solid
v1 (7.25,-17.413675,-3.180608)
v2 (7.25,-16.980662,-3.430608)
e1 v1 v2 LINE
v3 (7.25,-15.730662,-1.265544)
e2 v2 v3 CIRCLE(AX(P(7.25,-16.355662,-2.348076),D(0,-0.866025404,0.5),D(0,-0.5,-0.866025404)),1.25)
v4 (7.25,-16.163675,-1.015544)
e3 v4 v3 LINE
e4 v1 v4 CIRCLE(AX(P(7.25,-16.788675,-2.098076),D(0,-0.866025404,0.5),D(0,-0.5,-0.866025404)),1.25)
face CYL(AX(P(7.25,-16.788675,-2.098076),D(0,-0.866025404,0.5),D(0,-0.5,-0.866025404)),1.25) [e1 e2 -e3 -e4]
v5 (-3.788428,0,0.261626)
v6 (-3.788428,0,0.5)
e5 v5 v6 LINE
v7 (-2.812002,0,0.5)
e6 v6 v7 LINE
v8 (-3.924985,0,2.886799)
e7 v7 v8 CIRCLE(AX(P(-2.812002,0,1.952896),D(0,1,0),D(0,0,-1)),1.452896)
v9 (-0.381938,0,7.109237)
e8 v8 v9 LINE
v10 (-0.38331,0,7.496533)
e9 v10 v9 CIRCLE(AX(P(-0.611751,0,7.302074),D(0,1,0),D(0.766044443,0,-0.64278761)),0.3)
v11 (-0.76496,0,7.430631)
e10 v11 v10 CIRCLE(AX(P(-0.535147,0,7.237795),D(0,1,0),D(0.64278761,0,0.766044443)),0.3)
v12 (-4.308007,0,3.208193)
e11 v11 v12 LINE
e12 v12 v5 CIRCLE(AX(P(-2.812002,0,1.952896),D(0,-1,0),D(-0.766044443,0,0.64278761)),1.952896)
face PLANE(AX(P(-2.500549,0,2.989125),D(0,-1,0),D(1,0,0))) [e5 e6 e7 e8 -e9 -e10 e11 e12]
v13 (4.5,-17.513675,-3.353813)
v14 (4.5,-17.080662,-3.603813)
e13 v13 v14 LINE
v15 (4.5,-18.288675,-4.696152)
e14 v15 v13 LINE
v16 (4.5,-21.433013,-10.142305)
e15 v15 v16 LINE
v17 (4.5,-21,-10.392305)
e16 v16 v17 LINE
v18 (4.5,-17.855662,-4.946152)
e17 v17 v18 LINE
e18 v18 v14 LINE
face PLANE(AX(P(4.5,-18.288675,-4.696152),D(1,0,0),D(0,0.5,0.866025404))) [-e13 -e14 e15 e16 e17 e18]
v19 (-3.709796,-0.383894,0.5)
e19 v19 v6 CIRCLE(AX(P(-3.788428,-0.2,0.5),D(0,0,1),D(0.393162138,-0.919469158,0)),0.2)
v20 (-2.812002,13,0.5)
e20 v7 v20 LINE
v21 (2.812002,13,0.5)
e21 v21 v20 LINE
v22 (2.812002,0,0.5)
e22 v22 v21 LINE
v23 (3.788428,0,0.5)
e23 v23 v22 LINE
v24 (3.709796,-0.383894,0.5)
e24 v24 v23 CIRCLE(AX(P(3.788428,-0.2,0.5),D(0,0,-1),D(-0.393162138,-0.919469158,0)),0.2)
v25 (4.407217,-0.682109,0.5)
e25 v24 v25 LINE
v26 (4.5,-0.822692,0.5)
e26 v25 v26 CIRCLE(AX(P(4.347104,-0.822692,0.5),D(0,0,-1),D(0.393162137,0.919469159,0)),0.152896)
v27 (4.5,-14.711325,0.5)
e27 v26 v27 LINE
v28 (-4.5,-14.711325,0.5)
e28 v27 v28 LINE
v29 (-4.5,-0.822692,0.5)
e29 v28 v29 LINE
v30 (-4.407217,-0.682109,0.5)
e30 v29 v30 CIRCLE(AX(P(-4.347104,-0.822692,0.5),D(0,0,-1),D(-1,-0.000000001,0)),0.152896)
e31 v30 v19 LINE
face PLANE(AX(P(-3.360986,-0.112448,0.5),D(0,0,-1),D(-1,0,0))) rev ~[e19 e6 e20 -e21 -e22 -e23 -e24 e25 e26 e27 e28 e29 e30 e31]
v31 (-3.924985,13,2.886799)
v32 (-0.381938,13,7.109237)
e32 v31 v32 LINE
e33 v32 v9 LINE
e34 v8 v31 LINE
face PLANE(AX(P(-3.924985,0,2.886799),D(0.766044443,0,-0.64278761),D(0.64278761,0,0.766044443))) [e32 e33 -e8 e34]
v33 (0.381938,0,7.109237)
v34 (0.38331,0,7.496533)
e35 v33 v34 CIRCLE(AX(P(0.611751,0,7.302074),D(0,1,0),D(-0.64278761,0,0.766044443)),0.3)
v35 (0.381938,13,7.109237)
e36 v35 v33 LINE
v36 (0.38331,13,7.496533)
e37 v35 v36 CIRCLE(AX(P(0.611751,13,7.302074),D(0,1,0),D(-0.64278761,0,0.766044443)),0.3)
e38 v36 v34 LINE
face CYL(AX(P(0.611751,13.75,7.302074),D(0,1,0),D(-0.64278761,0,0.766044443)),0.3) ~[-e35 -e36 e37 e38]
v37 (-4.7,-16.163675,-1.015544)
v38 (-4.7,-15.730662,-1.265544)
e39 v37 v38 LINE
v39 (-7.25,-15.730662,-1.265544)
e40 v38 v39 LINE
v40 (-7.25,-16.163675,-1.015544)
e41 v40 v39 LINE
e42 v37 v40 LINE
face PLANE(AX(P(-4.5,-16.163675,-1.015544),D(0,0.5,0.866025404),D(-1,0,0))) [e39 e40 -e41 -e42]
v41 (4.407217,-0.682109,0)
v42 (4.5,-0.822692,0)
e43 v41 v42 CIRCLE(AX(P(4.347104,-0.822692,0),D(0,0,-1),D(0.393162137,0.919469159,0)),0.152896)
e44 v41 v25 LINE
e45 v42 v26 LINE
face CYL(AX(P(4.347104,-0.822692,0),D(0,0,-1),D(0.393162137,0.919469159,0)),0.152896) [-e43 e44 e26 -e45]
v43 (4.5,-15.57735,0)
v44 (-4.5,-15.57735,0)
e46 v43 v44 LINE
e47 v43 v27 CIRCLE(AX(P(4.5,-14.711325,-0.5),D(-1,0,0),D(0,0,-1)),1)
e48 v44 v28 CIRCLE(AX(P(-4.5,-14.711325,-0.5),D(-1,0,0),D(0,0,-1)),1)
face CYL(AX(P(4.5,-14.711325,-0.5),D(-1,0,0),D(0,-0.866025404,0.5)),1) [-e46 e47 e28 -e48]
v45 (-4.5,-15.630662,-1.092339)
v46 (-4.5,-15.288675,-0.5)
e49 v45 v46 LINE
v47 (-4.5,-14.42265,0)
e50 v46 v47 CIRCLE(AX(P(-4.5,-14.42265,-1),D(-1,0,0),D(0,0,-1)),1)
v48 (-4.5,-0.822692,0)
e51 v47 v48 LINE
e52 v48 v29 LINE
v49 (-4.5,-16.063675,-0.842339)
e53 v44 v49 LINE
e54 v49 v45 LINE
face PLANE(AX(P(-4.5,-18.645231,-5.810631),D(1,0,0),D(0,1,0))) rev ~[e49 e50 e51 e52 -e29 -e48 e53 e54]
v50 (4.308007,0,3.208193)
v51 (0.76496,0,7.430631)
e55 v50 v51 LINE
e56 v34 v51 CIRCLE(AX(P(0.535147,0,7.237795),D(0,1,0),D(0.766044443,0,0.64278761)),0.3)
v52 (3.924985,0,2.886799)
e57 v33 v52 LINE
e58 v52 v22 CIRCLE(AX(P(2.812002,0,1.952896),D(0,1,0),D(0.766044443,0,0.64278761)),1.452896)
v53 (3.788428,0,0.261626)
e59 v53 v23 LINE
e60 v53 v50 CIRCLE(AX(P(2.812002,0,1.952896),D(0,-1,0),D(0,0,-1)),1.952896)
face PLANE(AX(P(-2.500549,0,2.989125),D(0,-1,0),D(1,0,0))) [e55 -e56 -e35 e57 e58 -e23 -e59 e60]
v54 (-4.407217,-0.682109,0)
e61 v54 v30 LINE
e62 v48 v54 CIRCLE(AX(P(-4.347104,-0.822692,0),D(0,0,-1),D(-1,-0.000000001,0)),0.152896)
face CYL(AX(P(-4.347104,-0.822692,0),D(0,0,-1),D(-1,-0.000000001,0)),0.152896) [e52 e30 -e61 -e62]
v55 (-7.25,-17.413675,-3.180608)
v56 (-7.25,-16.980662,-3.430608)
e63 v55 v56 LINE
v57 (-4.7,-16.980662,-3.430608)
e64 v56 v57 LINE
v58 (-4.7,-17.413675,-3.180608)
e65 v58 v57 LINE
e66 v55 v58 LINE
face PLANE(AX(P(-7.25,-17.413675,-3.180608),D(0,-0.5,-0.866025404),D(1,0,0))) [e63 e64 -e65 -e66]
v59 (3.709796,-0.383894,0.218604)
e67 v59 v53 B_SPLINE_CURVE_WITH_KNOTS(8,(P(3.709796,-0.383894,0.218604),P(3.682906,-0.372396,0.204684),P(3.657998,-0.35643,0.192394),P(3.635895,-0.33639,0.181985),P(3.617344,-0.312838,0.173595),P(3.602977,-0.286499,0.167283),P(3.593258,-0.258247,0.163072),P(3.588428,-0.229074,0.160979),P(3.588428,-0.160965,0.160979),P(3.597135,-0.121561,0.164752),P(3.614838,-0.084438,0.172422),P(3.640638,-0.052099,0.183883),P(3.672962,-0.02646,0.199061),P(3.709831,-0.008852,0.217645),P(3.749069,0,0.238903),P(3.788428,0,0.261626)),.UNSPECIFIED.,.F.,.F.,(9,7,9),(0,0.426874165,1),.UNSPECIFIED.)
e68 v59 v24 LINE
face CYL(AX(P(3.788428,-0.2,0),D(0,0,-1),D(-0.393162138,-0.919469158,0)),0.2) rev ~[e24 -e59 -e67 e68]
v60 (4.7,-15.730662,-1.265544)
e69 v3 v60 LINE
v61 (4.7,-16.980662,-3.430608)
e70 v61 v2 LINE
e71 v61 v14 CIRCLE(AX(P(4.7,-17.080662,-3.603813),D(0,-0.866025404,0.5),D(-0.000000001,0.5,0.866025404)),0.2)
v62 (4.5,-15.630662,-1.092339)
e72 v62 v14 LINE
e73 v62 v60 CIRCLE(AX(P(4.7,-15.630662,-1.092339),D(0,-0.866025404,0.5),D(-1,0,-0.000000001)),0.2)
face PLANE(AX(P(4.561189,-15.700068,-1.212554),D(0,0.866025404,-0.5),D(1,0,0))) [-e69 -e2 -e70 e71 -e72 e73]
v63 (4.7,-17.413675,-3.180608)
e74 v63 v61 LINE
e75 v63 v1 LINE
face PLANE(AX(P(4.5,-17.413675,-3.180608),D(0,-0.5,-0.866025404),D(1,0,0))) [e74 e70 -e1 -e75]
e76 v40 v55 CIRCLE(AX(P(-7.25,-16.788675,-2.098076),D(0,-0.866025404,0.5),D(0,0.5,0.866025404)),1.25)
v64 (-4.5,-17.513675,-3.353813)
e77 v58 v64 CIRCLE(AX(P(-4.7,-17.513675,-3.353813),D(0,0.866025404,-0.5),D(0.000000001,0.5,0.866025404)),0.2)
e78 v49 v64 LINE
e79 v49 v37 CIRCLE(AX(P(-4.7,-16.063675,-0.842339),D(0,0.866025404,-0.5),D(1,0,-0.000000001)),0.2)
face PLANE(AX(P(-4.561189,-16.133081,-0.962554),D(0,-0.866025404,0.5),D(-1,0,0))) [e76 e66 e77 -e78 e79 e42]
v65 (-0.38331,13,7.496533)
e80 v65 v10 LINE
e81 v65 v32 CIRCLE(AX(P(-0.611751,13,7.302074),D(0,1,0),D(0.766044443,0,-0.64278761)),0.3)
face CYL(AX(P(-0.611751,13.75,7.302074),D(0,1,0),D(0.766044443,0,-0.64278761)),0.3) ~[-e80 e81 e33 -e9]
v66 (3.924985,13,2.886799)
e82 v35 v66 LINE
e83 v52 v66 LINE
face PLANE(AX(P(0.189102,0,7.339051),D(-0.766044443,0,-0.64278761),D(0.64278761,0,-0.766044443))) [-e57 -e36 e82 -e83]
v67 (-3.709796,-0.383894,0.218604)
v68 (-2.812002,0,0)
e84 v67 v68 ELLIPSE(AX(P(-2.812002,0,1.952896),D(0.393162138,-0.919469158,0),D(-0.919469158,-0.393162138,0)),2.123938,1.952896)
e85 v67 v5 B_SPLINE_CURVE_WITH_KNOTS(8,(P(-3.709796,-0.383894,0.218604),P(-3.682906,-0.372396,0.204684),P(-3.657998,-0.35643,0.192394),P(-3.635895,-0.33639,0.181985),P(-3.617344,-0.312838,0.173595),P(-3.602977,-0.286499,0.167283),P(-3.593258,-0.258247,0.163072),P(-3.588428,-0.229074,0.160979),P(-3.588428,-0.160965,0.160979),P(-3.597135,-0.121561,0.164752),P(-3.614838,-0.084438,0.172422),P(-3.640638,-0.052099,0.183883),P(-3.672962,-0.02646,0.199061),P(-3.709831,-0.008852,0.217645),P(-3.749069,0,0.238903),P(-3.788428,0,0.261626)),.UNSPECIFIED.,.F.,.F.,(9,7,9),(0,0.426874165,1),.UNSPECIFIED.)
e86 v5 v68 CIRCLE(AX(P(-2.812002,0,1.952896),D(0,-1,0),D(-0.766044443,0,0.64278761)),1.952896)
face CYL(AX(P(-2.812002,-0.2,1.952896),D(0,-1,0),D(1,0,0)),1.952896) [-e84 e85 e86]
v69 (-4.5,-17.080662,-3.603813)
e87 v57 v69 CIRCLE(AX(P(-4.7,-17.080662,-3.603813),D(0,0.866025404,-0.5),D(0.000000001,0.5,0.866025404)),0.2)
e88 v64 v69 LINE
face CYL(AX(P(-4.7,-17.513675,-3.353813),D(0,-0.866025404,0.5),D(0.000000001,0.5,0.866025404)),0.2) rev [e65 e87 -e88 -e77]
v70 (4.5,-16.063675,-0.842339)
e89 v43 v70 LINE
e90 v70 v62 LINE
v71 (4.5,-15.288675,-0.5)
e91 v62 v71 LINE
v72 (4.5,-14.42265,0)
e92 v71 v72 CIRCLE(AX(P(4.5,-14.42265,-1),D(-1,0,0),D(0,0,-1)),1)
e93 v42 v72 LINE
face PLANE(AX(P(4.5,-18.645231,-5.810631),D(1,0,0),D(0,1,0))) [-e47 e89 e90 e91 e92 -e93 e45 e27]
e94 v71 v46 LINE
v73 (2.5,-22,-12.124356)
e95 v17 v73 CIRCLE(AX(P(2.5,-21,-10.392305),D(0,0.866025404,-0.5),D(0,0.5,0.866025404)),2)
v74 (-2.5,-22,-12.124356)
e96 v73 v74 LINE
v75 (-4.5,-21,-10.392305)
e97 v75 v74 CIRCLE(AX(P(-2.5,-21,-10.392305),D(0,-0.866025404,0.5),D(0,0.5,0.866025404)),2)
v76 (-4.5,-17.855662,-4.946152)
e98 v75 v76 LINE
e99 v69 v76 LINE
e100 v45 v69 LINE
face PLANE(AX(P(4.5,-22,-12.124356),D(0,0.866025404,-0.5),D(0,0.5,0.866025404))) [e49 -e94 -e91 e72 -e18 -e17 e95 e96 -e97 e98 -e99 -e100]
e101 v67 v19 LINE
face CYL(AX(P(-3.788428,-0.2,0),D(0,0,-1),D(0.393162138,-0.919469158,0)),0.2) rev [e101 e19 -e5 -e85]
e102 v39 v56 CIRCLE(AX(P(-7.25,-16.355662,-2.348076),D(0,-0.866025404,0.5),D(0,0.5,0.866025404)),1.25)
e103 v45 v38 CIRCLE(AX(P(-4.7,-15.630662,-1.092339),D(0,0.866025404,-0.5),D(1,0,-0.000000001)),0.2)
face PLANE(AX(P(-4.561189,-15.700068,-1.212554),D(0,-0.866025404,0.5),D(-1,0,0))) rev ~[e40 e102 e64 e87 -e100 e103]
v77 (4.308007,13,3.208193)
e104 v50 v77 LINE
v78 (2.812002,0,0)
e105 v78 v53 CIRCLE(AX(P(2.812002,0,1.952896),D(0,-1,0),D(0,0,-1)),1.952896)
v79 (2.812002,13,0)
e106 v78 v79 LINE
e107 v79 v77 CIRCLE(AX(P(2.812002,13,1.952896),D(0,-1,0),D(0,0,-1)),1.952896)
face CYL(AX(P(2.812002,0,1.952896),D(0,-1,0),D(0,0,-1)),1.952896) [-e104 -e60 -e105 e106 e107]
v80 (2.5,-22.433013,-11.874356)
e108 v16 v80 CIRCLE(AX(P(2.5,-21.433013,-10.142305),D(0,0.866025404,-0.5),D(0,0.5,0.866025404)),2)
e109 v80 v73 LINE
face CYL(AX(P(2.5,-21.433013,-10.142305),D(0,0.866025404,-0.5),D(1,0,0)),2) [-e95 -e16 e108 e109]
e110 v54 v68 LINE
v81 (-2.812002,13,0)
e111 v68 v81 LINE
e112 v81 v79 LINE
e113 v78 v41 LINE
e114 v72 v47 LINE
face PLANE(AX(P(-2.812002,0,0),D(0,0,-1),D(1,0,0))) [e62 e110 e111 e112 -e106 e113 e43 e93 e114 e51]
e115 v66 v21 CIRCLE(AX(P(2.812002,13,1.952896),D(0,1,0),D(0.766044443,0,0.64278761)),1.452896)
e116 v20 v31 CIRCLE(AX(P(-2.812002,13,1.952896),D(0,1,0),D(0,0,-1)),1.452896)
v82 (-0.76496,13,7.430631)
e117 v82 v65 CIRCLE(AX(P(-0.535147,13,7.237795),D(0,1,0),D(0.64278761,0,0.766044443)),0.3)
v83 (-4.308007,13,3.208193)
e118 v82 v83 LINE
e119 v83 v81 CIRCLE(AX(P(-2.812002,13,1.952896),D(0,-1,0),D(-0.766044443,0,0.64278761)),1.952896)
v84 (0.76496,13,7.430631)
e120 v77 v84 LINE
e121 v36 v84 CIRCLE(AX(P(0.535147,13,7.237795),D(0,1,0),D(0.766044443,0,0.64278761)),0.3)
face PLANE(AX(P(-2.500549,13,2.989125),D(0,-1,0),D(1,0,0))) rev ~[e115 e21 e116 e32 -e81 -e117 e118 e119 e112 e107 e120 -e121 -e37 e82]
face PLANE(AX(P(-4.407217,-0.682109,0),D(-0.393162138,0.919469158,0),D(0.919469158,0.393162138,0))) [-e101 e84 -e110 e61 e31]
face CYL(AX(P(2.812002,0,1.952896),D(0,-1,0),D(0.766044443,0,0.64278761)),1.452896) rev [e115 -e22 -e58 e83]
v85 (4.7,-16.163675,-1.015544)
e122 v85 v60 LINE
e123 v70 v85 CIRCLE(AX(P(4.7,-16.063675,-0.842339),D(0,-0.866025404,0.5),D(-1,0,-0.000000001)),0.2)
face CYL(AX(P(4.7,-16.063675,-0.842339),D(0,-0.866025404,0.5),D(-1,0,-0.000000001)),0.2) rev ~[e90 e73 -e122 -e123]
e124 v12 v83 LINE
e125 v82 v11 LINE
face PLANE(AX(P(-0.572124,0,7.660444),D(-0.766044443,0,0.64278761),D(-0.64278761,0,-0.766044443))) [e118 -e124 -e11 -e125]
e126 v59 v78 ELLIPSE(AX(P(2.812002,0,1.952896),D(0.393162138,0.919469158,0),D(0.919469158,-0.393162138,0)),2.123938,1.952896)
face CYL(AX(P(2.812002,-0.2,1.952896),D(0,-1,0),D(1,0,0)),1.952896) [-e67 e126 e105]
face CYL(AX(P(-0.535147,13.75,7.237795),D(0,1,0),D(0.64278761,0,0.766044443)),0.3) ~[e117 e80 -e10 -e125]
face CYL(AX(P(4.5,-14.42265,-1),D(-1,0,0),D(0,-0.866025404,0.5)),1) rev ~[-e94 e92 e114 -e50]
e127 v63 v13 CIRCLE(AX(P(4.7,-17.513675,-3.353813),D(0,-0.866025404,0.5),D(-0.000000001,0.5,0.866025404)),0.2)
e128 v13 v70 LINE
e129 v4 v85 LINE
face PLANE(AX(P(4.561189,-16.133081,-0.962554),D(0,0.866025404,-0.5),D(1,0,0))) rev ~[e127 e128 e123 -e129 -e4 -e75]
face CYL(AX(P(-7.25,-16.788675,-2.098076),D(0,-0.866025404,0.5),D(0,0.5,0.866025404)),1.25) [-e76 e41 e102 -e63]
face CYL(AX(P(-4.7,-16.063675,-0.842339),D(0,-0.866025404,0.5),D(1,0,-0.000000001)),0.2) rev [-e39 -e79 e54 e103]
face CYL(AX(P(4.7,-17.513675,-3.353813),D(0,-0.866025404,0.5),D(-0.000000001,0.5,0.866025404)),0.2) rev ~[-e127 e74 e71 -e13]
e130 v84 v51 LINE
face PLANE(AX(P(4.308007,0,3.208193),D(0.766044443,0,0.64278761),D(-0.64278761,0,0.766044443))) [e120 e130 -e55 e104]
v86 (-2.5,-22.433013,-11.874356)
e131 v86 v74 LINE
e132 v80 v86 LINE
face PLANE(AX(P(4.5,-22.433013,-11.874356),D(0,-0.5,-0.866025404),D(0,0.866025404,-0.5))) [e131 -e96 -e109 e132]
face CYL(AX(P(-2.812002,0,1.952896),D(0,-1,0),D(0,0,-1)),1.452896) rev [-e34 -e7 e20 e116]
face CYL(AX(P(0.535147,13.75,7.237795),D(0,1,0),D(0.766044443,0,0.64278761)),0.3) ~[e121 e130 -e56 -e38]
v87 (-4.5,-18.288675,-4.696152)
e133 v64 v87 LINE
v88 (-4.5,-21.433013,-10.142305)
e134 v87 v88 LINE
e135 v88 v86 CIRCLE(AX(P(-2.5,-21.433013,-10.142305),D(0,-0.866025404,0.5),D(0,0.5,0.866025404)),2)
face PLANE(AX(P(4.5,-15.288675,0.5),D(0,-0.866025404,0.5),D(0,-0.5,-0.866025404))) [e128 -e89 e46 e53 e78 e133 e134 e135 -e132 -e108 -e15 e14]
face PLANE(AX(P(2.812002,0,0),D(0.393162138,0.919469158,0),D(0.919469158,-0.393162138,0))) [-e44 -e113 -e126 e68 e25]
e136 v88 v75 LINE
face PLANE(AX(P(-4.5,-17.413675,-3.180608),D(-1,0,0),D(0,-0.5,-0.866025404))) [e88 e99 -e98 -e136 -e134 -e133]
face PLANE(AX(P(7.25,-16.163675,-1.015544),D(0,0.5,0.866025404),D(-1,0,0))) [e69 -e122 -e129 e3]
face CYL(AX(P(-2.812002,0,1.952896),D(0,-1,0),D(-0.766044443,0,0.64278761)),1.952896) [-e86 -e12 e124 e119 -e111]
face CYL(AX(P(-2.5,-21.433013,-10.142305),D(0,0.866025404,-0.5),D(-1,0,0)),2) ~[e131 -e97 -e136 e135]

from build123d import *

# Parameters (mm, degrees)
F1_DEPTH      = 13
F3_W          = 5.624003956
F3_H          = 13
F4_DEPTH      = 0.5
F6_DEPTH      = 9
F8_W          = 1.375
F8_H          = 2.5
F9_DEPTH      = 0.5
F10_R         = 2
F11_R         = 1
F12_T1_DEPTH  = 14.5
F13_T1_DEPTH  = 0.5
F13_T6_DEPTH  = 0.5
F13_S7_R      = 1.95289555
F13_T8_DEPTH  = 2
F13_T12_DEPTH = 0.5
F13_S13_R     = 1.95289555
F13_T14_DEPTH = 2


# Not quite as in the source:
# - a fillet or chamfer that OpenCascade refuses, or shapes differently, is made with other operations: its cross-section is extruded or revolved along the edge and cut away or added


with BuildPart() as f1:
    # F0 (on Front) → F1 (new body)
    with BuildSketch(Plane.XZ):
        with BuildLine():
            Line((-0.1891016816, 7.3390506263), (-0.5721239031, 7.6604444312))
            Line((-0.5721239031, 7.6604444312), (-4.3080067621, 3.2081926126))
            ThreePointArc((-4.3080067621, 3.2081926126), (-4.5819264222, 1.1275662273), (-2.812001978, 0))
            Line((-2.812001978, 0), (0, 0))
            Line((0, 0), (0, 0.5))
            Line((0, 0.5), (-2.812001978, 0.5))
            ThreePointArc((-2.812001978, 0.5), (-4.1287725287, 1.3388753582), (-3.9249845405, 2.8867988077))
            Line((-3.9249845405, 2.8867988077), (-0.1891016816, 7.3390506263))
        make_face()
        with BuildLine():
            Line((0, 0.5), (0, 0))
            Line((0, 0), (2.812001978, 0))
            ThreePointArc((2.812001978, 0), (4.5819264222, 1.1275662273), (4.3080067621, 3.2081926126))
            Line((4.3080067621, 3.2081926126), (0.5721239031, 7.6604444312))
            Line((0.5721239031, 7.6604444312), (0.1891016816, 7.3390506263))
            Line((0.1891016816, 7.3390506263), (3.9249845405, 2.8867988077))
            ThreePointArc((3.9249845405, 2.8867988077), (4.1287725287, 1.3388753582), (2.812001978, 0.5))
            Line((2.812001978, 0.5), (0, 0.5))
        make_face()
    extrude(amount=-F1_DEPTH)

    # F3 (on offset) → F4 (join, through all)
    with BuildSketch(Plane(origin=(0, 0, 0), x_dir=(1, 0, 0), z_dir=(0, 0, -1))):
        with Locations((0, -6.5)):
            Rectangle(F3_W, F3_H)
        with BuildLine():
            Line((-2.812001978, 0), (2.812001978, 0))
            Line((2.812001978, 0), (4.4072171914, 0.6821090398))
            ThreePointArc((4.4072171914, 0.6821090398), (4.4747132661, 0.7384715991), (4.5, 0.8226917824))
            Line((4.5, 0.8226917824), (4.5, 15))
            Line((4.5, 15), (-4.5, 15))
            Line((-4.5, 15), (-4.5, 0.8226917824))
            ThreePointArc((-4.5, 0.8226917824), (-4.4747132661, 0.7384715991), (-4.4072171914, 0.6821090398))
            Line((-4.4072171914, 0.6821090398), (-2.812001978, 0))
        make_face()
    extrude(amount=-F4_DEPTH)

    # F5 (on face) → F6 (join, through all)
    with BuildSketch(Plane.YZ.offset(4.5)):
        Polygon((-22.4330127019, -11.874355653), (-22, -12.124355653), (-15, 0), (-15, 0.5), (-15.2886751346, 0.5), align=None)
    extrude(amount=-F6_DEPTH)

    # F8 (on offset) → F9 (join, through all)
    with BuildSketch(Plane(origin=(0, -11.6830127019, 6.7451905284), x_dir=(1, 0, 0), z_dir=(0, -0.8660254038, 0.5))):
        with Locations((-5.1875, -10.2113248654)):
            Rectangle(F8_W, F8_H)
        with BuildLine():
            Line((-5.875, -11.4613248654), (-5.875, -8.9613248654))
            Line((-5.875, -8.9613248654), (-7.25, -8.9613248654))
            ThreePointArc((-7.25, -8.9613248654), (-8.5, -10.2113248654), (-7.25, -11.4613248654))
            Line((-7.25, -11.4613248654), (-5.875, -11.4613248654))
        make_face()
        Polygon((4.5, -7.2113248654), (-4.5, -7.2113248654), (-4.5, -8.9613248654), (-4.5, -11.4613248654), (-4.5, -13.2113248654), (4.5, -13.2113248654), (4.5, -11.4613248654), (5.875, -11.4613248654), (5.875, -8.9613248654), (4.5, -8.9613248654), align=None)
        with BuildLine():
            Line((7.25, -8.9613248654), (5.875, -8.9613248654))
            Line((5.875, -8.9613248654), (5.875, -11.4613248654))
            Line((5.875, -11.4613248654), (7.25, -11.4613248654))
            ThreePointArc((7.25, -11.4613248654), (8.5, -10.2113248654), (7.25, -8.9613248654))
        make_face()
    extrude(amount=-F9_DEPTH)

    # F10
    f10_edges = [f1.edges().sort_by_distance(p)[0] for p in [
        (4.5, -22.216506, -11.999356),
        (-4.5, -22.216506, -11.999356),
    ]]
    fillet(f10_edges, radius=F10_R)

    # F11
    f11_edges = [f1.edges().sort_by_distance(p)[0] for p in [
        (0, -15.288675, 0.5),
        (0, -15, 0),
    ]]
    fillet(f11_edges, radius=F11_R)

    # F12: fillet of radius 0.3 on 4 edges, made by hand

    # F12_s2 → F12_t1 (cut)
    with BuildSketch(Plane.XZ.offset(-13.75)):
        with BuildLine():
            ThreePointArc((0.4189150145, 7.5318869093), (0.312892888, 7.3282202991), (0.3819379645, 7.1092372934))
            Line((0.3819379645, 7.1092372934), (0.1891016816, 7.3390506263))
            Line((0.1891016816, 7.3390506263), (0.4189150145, 7.5318869093))
        make_face()
        with BuildLine():
            ThreePointArc((-0.3819379645, 7.1092372934), (-0.312892888, 7.3282202991), (-0.4189150145, 7.5318869093))
            Line((-0.4189150145, 7.5318869093), (-0.1891016816, 7.3390506263))
            Line((-0.1891016816, 7.3390506263), (-0.3819379645, 7.1092372934))
        make_face()
        with BuildLine():
            ThreePointArc((0.764960186, 7.4306310983), (0.5612935759, 7.5366532248), (0.3423105702, 7.4676081483))
            Line((0.3423105702, 7.4676081483), (0.5721239031, 7.6604444312))
            Line((0.5721239031, 7.6604444312), (0.764960186, 7.4306310983))
        make_face()
        with BuildLine():
            ThreePointArc((-0.3423105702, 7.4676081483), (-0.5612935759, 7.5366532248), (-0.764960186, 7.4306310983))
            Line((-0.764960186, 7.4306310983), (-0.5721239031, 7.6604444312))
            Line((-0.5721239031, 7.6604444312), (-0.3423105702, 7.4676081483))
        make_face()
    extrude(amount=F12_T1_DEPTH, mode=Mode.SUBTRACT)

    # F13: fillet of radius 0.2 on 6 edges, made by hand

    # F13_s2 → F13_t1 (join)
    with BuildSketch(Plane(origin=(0, -11.6830127019, 6.7451905284), x_dir=(1, 0, 0), z_dir=(0, 0.8660254038, -0.5))):
        with BuildLine():
            ThreePointArc((-4.5, 8.7613248654), (-4.5585786438, 8.9027462216), (-4.7, 8.9613248654))
            Line((-4.7, 8.9613248654), (-4.5, 8.9613248654))
            Line((-4.5, 8.9613248654), (-4.5, 8.7613248654))
        make_face()
        with BuildLine():
            ThreePointArc((-4.7, 11.4613248654), (-4.5585786438, 11.5199035092), (-4.5, 11.6613248654))
            Line((-4.5, 11.6613248654), (-4.5, 11.4613248654))
            Line((-4.5, 11.4613248654), (-4.7, 11.4613248654))
        make_face()
        with BuildLine():
            ThreePointArc((4.5, 8.7613248654), (4.5585786438, 8.9027462216), (4.7, 8.9613248654))
            Line((4.7, 8.9613248654), (4.5, 8.9613248654))
            Line((4.5, 8.9613248654), (4.5, 8.7613248654))
        make_face()
        with BuildLine():
            ThreePointArc((4.7, 11.4613248654), (4.5585786438, 11.5199035092), (4.5, 11.6613248654))
            Line((4.5, 11.6613248654), (4.5, 11.4613248654))
            Line((4.5, 11.4613248654), (4.7, 11.4613248654))
        make_face()
    extrude(amount=F13_T1_DEPTH)


with BuildPart() as f13_tool4:
    # F13_s5 → F13_t6 (new body)
    with BuildSketch(Plane.XY):
        with BuildLine():
            ThreePointArc((3.7097957982, -0.3838938316), (3.5924961377, -0.159867509), (3.7884282258, 0))
            Line((3.7884282258, 0), (2.812001978, 0))
            Line((2.812001978, 0), (3.7097957982, -0.3838938316))
        make_face()
    extrude(amount=F13_T6_DEPTH)

    # F13_s7 → F13_t8 (intersect, symmetric)
    with BuildSketch(Plane.XZ.offset(0.2)):
        with Locations((2.812001978, 1.95289555)):
            Circle(F13_S7_R)
    extrude(amount=F13_T8_DEPTH, both=True, mode=Mode.INTERSECT)


with BuildPart() as f1_1:
    add(f1.part)

    # F13_t3: union F13_tool4
    add(f13_tool4.part)


with BuildPart() as f13_tool10:
    # F13_s11 → F13_t12 (new body)
    with BuildSketch(Plane.XY):
        with BuildLine():
            ThreePointArc((-3.7097957982, -0.3838938316), (-3.5924961377, -0.159867509), (-3.7884282258, 0))
            Line((-3.7884282258, 0), (-2.812001978, 0))
            Line((-2.812001978, 0), (-3.7097957982, -0.3838938316))
        make_face()
    extrude(amount=F13_T12_DEPTH)

    # F13_s13 → F13_t14 (intersect, symmetric)
    with BuildSketch(Plane.XZ.offset(0.2)):
        with Locations((-2.812001978, 1.95289555)):
            Circle(F13_S13_R)
    extrude(amount=F13_T14_DEPTH, both=True, mode=Mode.INTERSECT)


with BuildPart() as f1_2:
    add(f1_1.part)

    # F13_t9: union F13_tool10
    add(f13_tool10.part)


solid = f1_2.part
